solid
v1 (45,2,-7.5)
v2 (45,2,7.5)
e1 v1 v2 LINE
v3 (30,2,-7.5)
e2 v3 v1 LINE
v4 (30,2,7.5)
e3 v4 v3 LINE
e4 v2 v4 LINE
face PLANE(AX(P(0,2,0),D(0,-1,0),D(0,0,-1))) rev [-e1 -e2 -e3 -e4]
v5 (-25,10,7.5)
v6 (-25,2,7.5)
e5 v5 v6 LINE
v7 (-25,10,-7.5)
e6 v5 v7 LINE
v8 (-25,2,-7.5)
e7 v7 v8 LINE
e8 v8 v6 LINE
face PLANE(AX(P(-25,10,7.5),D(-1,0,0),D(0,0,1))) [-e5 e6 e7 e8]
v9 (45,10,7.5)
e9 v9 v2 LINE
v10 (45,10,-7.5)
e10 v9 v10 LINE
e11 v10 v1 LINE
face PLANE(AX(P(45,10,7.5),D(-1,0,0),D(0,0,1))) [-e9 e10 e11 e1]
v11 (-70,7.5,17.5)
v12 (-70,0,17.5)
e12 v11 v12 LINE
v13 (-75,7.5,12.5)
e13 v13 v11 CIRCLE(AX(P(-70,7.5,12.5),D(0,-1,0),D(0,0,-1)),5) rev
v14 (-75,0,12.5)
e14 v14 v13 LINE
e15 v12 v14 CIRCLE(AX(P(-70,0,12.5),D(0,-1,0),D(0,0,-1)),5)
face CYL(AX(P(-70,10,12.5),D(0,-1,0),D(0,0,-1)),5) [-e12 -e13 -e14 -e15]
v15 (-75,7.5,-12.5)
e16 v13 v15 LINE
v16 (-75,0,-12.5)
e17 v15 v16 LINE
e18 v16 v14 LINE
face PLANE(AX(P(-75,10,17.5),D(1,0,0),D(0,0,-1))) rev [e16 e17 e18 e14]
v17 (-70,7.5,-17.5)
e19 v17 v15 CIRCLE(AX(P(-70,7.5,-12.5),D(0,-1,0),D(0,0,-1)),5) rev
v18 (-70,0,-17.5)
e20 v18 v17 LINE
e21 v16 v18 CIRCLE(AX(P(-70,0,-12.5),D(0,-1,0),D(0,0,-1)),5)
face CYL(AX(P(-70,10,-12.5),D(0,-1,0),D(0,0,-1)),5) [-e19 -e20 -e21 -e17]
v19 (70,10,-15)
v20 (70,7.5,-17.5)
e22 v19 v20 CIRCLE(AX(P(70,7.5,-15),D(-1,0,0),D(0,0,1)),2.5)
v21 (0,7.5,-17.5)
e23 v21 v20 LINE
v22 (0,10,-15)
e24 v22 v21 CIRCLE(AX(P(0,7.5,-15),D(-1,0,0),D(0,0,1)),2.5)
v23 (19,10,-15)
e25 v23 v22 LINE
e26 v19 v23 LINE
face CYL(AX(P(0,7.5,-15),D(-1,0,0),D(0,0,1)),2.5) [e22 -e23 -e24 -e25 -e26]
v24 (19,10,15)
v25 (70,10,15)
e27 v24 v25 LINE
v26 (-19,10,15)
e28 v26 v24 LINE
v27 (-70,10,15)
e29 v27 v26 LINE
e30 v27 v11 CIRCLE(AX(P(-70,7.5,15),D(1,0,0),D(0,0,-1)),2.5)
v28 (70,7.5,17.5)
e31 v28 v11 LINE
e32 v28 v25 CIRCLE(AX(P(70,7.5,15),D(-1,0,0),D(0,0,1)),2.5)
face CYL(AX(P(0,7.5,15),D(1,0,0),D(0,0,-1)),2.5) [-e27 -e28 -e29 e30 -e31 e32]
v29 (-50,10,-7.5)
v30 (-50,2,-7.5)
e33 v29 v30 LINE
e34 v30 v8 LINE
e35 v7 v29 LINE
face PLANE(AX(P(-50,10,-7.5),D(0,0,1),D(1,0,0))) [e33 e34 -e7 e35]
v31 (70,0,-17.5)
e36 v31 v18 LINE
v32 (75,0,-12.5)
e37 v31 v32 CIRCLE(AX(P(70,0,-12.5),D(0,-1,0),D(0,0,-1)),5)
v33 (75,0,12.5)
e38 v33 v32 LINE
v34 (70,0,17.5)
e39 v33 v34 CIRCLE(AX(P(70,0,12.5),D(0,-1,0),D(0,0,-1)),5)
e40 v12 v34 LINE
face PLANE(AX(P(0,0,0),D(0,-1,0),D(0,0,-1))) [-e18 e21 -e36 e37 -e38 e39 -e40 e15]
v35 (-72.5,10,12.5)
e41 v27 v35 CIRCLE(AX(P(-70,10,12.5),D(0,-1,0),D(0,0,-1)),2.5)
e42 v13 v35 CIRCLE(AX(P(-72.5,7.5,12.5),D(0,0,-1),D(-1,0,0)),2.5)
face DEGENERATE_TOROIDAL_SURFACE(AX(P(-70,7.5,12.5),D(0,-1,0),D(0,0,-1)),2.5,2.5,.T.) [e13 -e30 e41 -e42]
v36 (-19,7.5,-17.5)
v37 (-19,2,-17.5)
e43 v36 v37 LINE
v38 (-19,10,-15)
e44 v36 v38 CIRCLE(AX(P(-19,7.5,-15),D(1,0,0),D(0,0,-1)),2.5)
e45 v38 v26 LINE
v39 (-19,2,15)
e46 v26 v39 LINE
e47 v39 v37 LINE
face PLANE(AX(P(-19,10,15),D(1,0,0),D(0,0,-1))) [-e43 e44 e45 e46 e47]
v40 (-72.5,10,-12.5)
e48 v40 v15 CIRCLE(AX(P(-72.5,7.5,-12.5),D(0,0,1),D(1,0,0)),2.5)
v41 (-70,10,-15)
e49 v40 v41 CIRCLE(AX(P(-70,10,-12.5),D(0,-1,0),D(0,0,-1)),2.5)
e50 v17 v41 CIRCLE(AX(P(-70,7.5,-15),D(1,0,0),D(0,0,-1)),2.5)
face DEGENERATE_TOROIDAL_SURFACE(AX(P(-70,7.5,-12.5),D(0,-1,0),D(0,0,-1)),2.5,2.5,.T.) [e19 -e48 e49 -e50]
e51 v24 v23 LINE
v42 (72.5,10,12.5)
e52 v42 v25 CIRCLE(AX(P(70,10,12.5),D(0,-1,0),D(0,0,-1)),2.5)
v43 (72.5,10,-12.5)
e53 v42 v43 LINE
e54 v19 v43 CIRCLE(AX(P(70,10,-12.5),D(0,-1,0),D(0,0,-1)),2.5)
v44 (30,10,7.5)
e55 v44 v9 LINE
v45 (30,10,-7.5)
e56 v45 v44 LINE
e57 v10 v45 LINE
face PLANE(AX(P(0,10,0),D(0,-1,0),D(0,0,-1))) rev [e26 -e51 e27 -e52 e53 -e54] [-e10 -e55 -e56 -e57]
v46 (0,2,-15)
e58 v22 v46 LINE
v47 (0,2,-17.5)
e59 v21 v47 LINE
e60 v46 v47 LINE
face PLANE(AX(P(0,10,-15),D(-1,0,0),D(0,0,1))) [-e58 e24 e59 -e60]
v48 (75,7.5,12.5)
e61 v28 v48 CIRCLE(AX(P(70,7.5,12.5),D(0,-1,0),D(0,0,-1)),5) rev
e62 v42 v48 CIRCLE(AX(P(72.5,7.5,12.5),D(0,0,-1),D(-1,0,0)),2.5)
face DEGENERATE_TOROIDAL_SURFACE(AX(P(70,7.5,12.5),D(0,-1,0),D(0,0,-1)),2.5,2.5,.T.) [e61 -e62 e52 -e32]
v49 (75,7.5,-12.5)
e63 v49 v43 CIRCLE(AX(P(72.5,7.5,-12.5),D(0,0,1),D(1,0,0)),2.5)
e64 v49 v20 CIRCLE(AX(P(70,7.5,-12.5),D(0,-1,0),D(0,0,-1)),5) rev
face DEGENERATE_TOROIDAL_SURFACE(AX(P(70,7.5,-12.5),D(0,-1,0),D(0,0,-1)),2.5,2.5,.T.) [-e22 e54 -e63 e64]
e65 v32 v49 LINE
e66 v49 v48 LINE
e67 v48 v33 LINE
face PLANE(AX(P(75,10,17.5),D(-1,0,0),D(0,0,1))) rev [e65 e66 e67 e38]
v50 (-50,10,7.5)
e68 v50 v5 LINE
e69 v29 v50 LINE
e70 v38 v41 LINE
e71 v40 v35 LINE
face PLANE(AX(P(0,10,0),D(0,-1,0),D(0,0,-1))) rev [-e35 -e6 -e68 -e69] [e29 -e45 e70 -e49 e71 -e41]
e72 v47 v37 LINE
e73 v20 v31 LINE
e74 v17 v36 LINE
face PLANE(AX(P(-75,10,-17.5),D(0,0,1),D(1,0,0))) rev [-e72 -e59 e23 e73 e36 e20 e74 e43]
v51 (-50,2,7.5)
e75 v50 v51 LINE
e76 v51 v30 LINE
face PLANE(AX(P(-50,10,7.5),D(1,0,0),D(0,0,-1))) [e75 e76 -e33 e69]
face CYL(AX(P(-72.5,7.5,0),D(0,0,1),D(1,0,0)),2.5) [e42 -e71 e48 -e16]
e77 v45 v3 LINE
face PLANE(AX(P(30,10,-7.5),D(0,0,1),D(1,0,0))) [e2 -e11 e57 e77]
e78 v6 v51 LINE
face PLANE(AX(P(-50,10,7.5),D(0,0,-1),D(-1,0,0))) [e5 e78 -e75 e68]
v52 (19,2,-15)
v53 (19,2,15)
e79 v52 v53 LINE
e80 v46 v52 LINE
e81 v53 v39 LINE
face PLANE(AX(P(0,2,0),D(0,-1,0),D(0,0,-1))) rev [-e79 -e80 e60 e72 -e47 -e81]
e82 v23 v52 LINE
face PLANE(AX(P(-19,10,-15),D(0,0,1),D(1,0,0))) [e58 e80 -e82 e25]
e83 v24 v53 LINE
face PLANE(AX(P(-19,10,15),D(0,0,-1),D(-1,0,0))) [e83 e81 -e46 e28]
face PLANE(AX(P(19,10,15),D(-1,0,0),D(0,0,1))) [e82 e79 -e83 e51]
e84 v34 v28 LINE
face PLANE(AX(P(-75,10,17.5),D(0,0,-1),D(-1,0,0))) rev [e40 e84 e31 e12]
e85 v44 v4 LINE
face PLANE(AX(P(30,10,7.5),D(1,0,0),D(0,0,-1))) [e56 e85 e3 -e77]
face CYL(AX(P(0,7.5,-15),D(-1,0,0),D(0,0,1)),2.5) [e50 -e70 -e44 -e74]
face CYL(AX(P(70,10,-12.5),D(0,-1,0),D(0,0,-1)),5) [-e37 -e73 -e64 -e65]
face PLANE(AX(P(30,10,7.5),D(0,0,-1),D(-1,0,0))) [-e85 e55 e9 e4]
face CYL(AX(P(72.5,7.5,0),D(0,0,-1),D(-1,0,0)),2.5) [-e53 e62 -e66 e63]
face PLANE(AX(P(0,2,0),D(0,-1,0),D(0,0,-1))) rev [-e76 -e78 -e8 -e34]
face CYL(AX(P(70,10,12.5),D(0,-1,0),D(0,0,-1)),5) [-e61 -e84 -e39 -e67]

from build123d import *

# Parameters (mm, degrees)
SKETCH1_W           = 150
SKETCH1_H           = 35
SKETCH1_W_2         = 38
SKETCH1_H_2         = 30
SKETCH1_W_3         = 25
SKETCH1_H_3         = 15
SKETCH1_W_4         = 15
BOSS_EXTRUDE1_DEPTH = 10
SKETCH2_W           = 25
SKETCH2_H           = 15
SKETCH2_W_2         = 38
SKETCH2_H_2         = 30
SKETCH2_W_3         = 15
BOSS_EXTRUDE2_DEPTH = 2
SKETCH3_W           = 19
SKETCH3_H           = 2.5
CUT_EXTRUDE3_DEPTH  = 8
FILLET1_START       = -75
FILLET1_DEPTH       = 150
FILLET1_START_2     = -18
FILLET1_2_DEPTH     = 36
FILLET2_R           = 5


with BuildPart() as part:
    # Sketch1 → Boss-Extrude1 (new body)
    with BuildSketch(Plane(origin=(0, 0, 0), x_dir=(1, 0, 0), z_dir=(0, 1, 0))):
        Rectangle(SKETCH1_W, SKETCH1_H)
        Rectangle(SKETCH1_W_2, SKETCH1_H_2, mode=Mode.SUBTRACT)
        with Locations((-37.5, 0)):
            Rectangle(SKETCH1_W_3, SKETCH1_H_3, mode=Mode.SUBTRACT)
        with Locations((37.5, 0)):
            Rectangle(SKETCH1_W_4, SKETCH1_H_3, mode=Mode.SUBTRACT)
    extrude(amount=BOSS_EXTRUDE1_DEPTH)

    # Sketch2 → Boss-Extrude2 (add)
    with BuildSketch(Plane.XZ):
        with Locations((-37.5, 0)):
            Rectangle(SKETCH2_W, SKETCH2_H)
        Rectangle(SKETCH2_W_2, SKETCH2_H_2)
        with Locations((37.5, 0)):
            Rectangle(SKETCH2_W_3, SKETCH2_H)
    extrude(amount=-BOSS_EXTRUDE2_DEPTH)

    # Sketch3 → Cut-Extrude3 (cut)
    with BuildSketch(Plane(origin=(0, 2, 0), x_dir=(1, 0, 0), z_dir=(0, 1, 0))):
        with Locations((-9.5, 16.25)):
            Rectangle(SKETCH3_W, SKETCH3_H)
    extrude(amount=CUT_EXTRUDE3_DEPTH, mode=Mode.SUBTRACT)

    # Fillet1: read off the stored shape, not the designer's step
    # Fillet1 outline → Fillet1 (cut)
    with BuildSketch(Plane.YZ.offset(FILLET1_START)):
        with BuildLine():
            Line((10, -17.5), (10, -15))
            ThreePointArc((10, -15), (9.267766953, -16.767766953), (7.5, -17.5))
            Line((7.5, -17.5), (10, -17.5))
        make_face()
        with BuildLine():
            ThreePointArc((7.5, 17.5), (9.267766953, 16.767766953), (10, 15))
            Line((10, 15), (10, 17.5))
            Line((10, 17.5), (7.5, 17.5))
        make_face()
    extrude(amount=FILLET1_DEPTH, mode=Mode.SUBTRACT)

    # Fillet1 2 outline → Fillet1 2 (cut)
    with BuildSketch(Plane.XY.offset(FILLET1_START_2)):
        with BuildLine():
            Line((75, 10), (72.5, 10))
            ThreePointArc((72.5, 10), (74.267766953, 9.267766953), (75, 7.5))
            Line((75, 7.5), (75, 10))
        make_face()
        with BuildLine():
            ThreePointArc((-75, 7.5), (-74.267766953, 9.267766953), (-72.5, 10))
            Line((-72.5, 10), (-75, 10))
            Line((-75, 10), (-75, 7.5))
        make_face()
    extrude(amount=FILLET1_2_DEPTH, mode=Mode.SUBTRACT)

    # Fillet2
    # the kernel refuses this fillet: 5 mm, written as the material it takes off along each edge
    with BuildSketch(Plane(origin=(70, 10, -12.5), x_dir=(1, 0, 0), z_dir=(0, 0, 1))) as fillet2_piece_1:
        with BuildLine():
            CenterArc((2.5, -2.5), 2.5, 0, 90)
            Line((5, -2.5), (5, 0))
            Line((5, 0), (2.5, 0))
        make_face()
    revolve(axis=Axis((70, 10, -12.5), (0, 1, 0)), revolution_arc=90, mode=Mode.SUBTRACT)
    with BuildSketch(Plane(origin=(70, 10, 12.5), x_dir=(0, 0, 1), z_dir=(-1, 0, 0))) as fillet2_piece_2:
        with BuildLine():
            CenterArc((2.5, -2.5), 2.5, 0, 90)
            Line((5, -2.5), (5, 0))
            Line((5, 0), (2.5, 0))
        make_face()
    revolve(axis=Axis((70, 10, 12.5), (0, 1, 0)), revolution_arc=90, mode=Mode.SUBTRACT)
    with BuildSketch(Plane(origin=(-70, 10, -12.5), x_dir=(0, 0, -1), z_dir=(1, 0, 0))) as fillet2_piece_3:
        with BuildLine():
            CenterArc((2.5, -2.5), 2.5, 0, 90)
            Line((5, -2.5), (5, 0))
            Line((5, 0), (2.5, 0))
        make_face()
    revolve(axis=Axis((-70, 10, -12.5), (0, 1, 0)), revolution_arc=90, mode=Mode.SUBTRACT)
    with BuildSketch(Plane(origin=(-70, 10, 12.5), x_dir=(-1, 0, 0), z_dir=(0, 0, -1))) as fillet2_piece_4:
        with BuildLine():
            CenterArc((2.5, -2.5), 2.5, 0, 90)
            Line((5, -2.5), (5, 0))
            Line((5, 0), (2.5, 0))
        make_face()
    revolve(axis=Axis((-70, 10, 12.5), (0, 1, 0)), revolution_arc=90, mode=Mode.SUBTRACT)
    with BuildSketch(Plane(origin=(-75, -12.5, 17.5), x_dir=(1, 0, 0), z_dir=(0, 1, 0)), Plane(origin=(-75, -12.5, -17.5), x_dir=(0, 0, 1), z_dir=(0, 1, 0))) as fillet2_piece_5:
        with BuildLine():
            CenterArc((FILLET2_R, FILLET2_R), FILLET2_R, 180, 90)
            Line((0, FILLET2_R), (0, 0))
            Line((0, 0), (FILLET2_R, 0))
        make_face()
    extrude(amount=22.5, mode=Mode.SUBTRACT)
    with BuildSketch(Plane(origin=(75, -12.5, -17.5), x_dir=(0, 0, 1), z_dir=(0, 1, 0)), Plane(origin=(75, -12.5, 17.5), x_dir=(-1, 0, 0), z_dir=(0, 1, 0))) as fillet2_piece_6:
        with BuildLine():
            CenterArc((FILLET2_R, -FILLET2_R), FILLET2_R, 90, 90)
            Line((0, -FILLET2_R), (0, 0))
            Line((0, 0), (FILLET2_R, 0))
        make_face()
    extrude(amount=22.5, mode=Mode.SUBTRACT)


solid = part.part
